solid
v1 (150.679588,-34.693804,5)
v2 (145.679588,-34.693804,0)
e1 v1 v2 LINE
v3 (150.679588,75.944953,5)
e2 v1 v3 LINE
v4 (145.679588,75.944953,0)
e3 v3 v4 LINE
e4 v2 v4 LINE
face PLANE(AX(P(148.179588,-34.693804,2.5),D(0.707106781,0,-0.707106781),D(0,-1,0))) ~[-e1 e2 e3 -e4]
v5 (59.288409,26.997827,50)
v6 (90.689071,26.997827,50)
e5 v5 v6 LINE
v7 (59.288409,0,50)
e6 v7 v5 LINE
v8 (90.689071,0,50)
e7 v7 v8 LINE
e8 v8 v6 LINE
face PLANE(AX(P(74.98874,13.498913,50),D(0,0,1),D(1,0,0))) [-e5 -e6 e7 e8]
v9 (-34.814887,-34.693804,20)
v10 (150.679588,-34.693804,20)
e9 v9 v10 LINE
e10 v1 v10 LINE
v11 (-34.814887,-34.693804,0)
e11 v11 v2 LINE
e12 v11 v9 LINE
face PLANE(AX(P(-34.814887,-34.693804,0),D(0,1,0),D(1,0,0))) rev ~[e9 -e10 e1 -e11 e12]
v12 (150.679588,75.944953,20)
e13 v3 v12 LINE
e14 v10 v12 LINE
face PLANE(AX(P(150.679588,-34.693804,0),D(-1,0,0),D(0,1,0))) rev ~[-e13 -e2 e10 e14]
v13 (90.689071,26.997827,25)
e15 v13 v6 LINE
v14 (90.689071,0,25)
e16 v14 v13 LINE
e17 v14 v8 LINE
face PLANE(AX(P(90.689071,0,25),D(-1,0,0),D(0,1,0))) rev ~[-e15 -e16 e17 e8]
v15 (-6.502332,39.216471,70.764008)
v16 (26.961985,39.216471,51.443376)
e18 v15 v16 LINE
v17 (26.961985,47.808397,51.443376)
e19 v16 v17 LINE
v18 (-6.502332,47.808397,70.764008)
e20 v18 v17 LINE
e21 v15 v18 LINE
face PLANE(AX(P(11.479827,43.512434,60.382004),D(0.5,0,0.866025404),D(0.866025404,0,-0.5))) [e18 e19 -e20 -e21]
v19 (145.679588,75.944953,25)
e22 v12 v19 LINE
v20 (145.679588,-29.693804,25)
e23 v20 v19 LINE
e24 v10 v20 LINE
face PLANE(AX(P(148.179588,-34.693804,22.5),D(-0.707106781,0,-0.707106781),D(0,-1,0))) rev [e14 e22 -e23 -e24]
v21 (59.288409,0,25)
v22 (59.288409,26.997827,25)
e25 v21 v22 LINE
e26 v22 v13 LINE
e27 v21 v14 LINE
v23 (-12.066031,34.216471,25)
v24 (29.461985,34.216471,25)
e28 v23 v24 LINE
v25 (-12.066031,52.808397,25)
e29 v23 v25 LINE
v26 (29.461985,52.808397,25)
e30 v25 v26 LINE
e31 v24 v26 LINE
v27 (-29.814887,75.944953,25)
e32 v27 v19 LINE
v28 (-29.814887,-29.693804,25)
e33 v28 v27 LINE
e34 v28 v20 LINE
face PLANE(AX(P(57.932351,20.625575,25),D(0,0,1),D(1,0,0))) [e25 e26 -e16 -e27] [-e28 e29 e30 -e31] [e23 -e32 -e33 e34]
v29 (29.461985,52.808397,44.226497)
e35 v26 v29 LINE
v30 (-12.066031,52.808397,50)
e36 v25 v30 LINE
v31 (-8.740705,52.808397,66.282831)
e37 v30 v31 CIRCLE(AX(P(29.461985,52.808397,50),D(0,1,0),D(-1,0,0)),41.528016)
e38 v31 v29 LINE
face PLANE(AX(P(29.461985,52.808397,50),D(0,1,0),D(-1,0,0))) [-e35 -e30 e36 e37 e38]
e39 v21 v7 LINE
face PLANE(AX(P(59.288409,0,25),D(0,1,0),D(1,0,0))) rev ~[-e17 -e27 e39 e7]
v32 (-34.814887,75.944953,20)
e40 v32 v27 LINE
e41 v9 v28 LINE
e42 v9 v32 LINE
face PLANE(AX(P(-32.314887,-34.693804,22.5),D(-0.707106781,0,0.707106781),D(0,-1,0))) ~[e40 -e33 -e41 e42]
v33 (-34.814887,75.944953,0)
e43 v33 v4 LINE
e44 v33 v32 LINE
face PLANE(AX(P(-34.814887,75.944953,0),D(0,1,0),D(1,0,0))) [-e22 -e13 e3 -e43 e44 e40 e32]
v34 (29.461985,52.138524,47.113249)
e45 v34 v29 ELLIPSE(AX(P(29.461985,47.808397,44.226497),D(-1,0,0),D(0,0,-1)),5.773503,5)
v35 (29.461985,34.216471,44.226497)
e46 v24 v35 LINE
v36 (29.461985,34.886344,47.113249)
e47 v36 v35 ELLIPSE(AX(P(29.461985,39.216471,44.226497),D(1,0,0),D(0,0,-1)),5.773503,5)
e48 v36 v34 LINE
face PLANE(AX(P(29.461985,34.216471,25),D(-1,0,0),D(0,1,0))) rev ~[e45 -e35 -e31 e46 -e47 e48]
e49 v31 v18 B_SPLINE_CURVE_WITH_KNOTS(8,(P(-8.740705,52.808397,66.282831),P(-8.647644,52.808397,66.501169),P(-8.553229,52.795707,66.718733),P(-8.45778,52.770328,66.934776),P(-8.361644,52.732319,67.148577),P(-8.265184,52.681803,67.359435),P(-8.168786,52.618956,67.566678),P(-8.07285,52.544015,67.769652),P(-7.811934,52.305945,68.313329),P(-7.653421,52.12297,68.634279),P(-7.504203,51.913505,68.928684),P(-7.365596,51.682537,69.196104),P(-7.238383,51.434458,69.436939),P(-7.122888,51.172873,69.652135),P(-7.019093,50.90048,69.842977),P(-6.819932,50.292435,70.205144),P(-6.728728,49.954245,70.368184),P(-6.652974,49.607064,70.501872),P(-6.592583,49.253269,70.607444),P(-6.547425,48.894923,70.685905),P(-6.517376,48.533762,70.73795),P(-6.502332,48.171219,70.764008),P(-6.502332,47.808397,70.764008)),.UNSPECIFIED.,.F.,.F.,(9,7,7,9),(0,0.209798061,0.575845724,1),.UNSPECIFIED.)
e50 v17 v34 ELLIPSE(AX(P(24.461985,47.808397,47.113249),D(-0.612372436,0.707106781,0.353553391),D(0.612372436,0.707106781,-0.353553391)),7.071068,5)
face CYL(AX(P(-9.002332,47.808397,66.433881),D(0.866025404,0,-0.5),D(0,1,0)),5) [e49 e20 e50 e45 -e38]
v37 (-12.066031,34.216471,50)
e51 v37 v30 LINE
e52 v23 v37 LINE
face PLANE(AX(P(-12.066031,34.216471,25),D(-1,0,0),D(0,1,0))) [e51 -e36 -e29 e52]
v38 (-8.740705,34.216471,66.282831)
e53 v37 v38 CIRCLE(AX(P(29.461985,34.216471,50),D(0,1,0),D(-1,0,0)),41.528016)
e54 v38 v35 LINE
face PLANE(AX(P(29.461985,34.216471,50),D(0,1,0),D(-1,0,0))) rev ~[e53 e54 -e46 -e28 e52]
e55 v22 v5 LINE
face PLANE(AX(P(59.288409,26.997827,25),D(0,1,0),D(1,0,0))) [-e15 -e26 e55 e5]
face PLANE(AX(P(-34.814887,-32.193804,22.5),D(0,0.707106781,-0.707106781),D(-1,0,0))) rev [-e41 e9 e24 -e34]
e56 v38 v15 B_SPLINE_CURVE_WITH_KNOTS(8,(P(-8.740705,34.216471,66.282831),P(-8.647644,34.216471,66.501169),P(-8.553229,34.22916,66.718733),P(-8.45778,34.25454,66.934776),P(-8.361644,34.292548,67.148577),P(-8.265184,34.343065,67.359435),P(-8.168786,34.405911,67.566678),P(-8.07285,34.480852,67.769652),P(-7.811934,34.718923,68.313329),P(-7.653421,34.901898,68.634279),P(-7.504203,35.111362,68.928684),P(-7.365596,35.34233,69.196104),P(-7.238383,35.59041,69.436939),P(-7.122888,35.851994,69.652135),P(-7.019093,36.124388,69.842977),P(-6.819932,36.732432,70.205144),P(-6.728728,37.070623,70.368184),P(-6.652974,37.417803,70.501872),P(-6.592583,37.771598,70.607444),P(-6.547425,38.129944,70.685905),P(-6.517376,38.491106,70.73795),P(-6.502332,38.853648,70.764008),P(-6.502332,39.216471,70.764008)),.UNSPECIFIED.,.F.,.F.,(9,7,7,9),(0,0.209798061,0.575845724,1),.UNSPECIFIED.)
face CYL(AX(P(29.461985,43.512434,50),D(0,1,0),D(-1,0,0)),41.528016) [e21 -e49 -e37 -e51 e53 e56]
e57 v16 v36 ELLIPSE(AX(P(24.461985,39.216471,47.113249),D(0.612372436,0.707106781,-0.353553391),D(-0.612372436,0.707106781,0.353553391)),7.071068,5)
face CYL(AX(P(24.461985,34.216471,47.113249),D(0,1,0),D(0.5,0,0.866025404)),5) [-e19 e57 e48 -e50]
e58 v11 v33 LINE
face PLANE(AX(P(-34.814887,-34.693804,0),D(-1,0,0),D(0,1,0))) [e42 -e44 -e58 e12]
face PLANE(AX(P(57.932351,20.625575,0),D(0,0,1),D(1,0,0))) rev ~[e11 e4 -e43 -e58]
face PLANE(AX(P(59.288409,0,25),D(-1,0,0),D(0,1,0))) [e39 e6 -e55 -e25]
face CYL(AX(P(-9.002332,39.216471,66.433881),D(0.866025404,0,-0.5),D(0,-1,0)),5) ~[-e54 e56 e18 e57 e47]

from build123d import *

# Parameters (mm, degrees)
F0_W      = 185.4944750667
F0_H      = 110.638756305
F1_DEPTH  = 25
F2_SIZE   = 5
F3_W      = 31.4006619155
F3_H      = 26.9978269935
F3_W_2    = 41.5280163288
F3_H_2    = 18.5919255018
F4_DEPTH  = 25
F4_FACE_W = 41.5280163288
F4_FACE_H = 18.5919255018
F5_ANGLE  = 30
F6_R      = 5


with BuildPart() as f1:
    # F0 (on Top) → F1 (new body)
    with BuildSketch(Plane.XY):
        with Locations((57.9323507845, 20.6255745143)):
            Rectangle(F0_W, F0_H)
    extrude(amount=F1_DEPTH)

    # F2
    f2_edges = [f1.edges().sort_by_distance(p)[0] for p in [
        (57.932351, -34.693804, 25),
        (-34.814887, 20.625575, 25),
        (150.679588, 20.625575, 25),
        (150.679588, 20.625575, 0),
    ]]
    chamfer(f2_edges, length=F2_SIZE)

    # F3 (on face) → F4 (join)
    with BuildSketch(Plane.XY.offset(25)):
        with Locations((74.988739565, 13.4989134967)):
            Rectangle(F3_W, F3_H)
        with Locations((8.6979772896, 43.5124337673)):
            Rectangle(F3_W_2, F3_H_2)
    extrude(amount=F4_DEPTH)

    # F4_face (on face) → F5 (revolve)
    with BuildSketch(Plane(origin=(8.6979772896, 43.5124337673, 50), x_dir=(1, 0, 0), z_dir=(0, 0, 1))):
        Rectangle(F4_FACE_W, F4_FACE_H)
    revolve(axis=Axis((29.461985454, 43.5124337673, 50), (0, 1, 0)), revolution_arc=F5_ANGLE)

    # F6
    f6_edges = [f1.edges().sort_by_distance(p)[0] for p in [
        (11.479827, 34.216471, 60.382004),
        (11.479827, 52.808397, 60.382004),
        (29.461985, 43.512434, 50),
    ]]
    fillet(f6_edges, radius=F6_R)


solid = f1.part
